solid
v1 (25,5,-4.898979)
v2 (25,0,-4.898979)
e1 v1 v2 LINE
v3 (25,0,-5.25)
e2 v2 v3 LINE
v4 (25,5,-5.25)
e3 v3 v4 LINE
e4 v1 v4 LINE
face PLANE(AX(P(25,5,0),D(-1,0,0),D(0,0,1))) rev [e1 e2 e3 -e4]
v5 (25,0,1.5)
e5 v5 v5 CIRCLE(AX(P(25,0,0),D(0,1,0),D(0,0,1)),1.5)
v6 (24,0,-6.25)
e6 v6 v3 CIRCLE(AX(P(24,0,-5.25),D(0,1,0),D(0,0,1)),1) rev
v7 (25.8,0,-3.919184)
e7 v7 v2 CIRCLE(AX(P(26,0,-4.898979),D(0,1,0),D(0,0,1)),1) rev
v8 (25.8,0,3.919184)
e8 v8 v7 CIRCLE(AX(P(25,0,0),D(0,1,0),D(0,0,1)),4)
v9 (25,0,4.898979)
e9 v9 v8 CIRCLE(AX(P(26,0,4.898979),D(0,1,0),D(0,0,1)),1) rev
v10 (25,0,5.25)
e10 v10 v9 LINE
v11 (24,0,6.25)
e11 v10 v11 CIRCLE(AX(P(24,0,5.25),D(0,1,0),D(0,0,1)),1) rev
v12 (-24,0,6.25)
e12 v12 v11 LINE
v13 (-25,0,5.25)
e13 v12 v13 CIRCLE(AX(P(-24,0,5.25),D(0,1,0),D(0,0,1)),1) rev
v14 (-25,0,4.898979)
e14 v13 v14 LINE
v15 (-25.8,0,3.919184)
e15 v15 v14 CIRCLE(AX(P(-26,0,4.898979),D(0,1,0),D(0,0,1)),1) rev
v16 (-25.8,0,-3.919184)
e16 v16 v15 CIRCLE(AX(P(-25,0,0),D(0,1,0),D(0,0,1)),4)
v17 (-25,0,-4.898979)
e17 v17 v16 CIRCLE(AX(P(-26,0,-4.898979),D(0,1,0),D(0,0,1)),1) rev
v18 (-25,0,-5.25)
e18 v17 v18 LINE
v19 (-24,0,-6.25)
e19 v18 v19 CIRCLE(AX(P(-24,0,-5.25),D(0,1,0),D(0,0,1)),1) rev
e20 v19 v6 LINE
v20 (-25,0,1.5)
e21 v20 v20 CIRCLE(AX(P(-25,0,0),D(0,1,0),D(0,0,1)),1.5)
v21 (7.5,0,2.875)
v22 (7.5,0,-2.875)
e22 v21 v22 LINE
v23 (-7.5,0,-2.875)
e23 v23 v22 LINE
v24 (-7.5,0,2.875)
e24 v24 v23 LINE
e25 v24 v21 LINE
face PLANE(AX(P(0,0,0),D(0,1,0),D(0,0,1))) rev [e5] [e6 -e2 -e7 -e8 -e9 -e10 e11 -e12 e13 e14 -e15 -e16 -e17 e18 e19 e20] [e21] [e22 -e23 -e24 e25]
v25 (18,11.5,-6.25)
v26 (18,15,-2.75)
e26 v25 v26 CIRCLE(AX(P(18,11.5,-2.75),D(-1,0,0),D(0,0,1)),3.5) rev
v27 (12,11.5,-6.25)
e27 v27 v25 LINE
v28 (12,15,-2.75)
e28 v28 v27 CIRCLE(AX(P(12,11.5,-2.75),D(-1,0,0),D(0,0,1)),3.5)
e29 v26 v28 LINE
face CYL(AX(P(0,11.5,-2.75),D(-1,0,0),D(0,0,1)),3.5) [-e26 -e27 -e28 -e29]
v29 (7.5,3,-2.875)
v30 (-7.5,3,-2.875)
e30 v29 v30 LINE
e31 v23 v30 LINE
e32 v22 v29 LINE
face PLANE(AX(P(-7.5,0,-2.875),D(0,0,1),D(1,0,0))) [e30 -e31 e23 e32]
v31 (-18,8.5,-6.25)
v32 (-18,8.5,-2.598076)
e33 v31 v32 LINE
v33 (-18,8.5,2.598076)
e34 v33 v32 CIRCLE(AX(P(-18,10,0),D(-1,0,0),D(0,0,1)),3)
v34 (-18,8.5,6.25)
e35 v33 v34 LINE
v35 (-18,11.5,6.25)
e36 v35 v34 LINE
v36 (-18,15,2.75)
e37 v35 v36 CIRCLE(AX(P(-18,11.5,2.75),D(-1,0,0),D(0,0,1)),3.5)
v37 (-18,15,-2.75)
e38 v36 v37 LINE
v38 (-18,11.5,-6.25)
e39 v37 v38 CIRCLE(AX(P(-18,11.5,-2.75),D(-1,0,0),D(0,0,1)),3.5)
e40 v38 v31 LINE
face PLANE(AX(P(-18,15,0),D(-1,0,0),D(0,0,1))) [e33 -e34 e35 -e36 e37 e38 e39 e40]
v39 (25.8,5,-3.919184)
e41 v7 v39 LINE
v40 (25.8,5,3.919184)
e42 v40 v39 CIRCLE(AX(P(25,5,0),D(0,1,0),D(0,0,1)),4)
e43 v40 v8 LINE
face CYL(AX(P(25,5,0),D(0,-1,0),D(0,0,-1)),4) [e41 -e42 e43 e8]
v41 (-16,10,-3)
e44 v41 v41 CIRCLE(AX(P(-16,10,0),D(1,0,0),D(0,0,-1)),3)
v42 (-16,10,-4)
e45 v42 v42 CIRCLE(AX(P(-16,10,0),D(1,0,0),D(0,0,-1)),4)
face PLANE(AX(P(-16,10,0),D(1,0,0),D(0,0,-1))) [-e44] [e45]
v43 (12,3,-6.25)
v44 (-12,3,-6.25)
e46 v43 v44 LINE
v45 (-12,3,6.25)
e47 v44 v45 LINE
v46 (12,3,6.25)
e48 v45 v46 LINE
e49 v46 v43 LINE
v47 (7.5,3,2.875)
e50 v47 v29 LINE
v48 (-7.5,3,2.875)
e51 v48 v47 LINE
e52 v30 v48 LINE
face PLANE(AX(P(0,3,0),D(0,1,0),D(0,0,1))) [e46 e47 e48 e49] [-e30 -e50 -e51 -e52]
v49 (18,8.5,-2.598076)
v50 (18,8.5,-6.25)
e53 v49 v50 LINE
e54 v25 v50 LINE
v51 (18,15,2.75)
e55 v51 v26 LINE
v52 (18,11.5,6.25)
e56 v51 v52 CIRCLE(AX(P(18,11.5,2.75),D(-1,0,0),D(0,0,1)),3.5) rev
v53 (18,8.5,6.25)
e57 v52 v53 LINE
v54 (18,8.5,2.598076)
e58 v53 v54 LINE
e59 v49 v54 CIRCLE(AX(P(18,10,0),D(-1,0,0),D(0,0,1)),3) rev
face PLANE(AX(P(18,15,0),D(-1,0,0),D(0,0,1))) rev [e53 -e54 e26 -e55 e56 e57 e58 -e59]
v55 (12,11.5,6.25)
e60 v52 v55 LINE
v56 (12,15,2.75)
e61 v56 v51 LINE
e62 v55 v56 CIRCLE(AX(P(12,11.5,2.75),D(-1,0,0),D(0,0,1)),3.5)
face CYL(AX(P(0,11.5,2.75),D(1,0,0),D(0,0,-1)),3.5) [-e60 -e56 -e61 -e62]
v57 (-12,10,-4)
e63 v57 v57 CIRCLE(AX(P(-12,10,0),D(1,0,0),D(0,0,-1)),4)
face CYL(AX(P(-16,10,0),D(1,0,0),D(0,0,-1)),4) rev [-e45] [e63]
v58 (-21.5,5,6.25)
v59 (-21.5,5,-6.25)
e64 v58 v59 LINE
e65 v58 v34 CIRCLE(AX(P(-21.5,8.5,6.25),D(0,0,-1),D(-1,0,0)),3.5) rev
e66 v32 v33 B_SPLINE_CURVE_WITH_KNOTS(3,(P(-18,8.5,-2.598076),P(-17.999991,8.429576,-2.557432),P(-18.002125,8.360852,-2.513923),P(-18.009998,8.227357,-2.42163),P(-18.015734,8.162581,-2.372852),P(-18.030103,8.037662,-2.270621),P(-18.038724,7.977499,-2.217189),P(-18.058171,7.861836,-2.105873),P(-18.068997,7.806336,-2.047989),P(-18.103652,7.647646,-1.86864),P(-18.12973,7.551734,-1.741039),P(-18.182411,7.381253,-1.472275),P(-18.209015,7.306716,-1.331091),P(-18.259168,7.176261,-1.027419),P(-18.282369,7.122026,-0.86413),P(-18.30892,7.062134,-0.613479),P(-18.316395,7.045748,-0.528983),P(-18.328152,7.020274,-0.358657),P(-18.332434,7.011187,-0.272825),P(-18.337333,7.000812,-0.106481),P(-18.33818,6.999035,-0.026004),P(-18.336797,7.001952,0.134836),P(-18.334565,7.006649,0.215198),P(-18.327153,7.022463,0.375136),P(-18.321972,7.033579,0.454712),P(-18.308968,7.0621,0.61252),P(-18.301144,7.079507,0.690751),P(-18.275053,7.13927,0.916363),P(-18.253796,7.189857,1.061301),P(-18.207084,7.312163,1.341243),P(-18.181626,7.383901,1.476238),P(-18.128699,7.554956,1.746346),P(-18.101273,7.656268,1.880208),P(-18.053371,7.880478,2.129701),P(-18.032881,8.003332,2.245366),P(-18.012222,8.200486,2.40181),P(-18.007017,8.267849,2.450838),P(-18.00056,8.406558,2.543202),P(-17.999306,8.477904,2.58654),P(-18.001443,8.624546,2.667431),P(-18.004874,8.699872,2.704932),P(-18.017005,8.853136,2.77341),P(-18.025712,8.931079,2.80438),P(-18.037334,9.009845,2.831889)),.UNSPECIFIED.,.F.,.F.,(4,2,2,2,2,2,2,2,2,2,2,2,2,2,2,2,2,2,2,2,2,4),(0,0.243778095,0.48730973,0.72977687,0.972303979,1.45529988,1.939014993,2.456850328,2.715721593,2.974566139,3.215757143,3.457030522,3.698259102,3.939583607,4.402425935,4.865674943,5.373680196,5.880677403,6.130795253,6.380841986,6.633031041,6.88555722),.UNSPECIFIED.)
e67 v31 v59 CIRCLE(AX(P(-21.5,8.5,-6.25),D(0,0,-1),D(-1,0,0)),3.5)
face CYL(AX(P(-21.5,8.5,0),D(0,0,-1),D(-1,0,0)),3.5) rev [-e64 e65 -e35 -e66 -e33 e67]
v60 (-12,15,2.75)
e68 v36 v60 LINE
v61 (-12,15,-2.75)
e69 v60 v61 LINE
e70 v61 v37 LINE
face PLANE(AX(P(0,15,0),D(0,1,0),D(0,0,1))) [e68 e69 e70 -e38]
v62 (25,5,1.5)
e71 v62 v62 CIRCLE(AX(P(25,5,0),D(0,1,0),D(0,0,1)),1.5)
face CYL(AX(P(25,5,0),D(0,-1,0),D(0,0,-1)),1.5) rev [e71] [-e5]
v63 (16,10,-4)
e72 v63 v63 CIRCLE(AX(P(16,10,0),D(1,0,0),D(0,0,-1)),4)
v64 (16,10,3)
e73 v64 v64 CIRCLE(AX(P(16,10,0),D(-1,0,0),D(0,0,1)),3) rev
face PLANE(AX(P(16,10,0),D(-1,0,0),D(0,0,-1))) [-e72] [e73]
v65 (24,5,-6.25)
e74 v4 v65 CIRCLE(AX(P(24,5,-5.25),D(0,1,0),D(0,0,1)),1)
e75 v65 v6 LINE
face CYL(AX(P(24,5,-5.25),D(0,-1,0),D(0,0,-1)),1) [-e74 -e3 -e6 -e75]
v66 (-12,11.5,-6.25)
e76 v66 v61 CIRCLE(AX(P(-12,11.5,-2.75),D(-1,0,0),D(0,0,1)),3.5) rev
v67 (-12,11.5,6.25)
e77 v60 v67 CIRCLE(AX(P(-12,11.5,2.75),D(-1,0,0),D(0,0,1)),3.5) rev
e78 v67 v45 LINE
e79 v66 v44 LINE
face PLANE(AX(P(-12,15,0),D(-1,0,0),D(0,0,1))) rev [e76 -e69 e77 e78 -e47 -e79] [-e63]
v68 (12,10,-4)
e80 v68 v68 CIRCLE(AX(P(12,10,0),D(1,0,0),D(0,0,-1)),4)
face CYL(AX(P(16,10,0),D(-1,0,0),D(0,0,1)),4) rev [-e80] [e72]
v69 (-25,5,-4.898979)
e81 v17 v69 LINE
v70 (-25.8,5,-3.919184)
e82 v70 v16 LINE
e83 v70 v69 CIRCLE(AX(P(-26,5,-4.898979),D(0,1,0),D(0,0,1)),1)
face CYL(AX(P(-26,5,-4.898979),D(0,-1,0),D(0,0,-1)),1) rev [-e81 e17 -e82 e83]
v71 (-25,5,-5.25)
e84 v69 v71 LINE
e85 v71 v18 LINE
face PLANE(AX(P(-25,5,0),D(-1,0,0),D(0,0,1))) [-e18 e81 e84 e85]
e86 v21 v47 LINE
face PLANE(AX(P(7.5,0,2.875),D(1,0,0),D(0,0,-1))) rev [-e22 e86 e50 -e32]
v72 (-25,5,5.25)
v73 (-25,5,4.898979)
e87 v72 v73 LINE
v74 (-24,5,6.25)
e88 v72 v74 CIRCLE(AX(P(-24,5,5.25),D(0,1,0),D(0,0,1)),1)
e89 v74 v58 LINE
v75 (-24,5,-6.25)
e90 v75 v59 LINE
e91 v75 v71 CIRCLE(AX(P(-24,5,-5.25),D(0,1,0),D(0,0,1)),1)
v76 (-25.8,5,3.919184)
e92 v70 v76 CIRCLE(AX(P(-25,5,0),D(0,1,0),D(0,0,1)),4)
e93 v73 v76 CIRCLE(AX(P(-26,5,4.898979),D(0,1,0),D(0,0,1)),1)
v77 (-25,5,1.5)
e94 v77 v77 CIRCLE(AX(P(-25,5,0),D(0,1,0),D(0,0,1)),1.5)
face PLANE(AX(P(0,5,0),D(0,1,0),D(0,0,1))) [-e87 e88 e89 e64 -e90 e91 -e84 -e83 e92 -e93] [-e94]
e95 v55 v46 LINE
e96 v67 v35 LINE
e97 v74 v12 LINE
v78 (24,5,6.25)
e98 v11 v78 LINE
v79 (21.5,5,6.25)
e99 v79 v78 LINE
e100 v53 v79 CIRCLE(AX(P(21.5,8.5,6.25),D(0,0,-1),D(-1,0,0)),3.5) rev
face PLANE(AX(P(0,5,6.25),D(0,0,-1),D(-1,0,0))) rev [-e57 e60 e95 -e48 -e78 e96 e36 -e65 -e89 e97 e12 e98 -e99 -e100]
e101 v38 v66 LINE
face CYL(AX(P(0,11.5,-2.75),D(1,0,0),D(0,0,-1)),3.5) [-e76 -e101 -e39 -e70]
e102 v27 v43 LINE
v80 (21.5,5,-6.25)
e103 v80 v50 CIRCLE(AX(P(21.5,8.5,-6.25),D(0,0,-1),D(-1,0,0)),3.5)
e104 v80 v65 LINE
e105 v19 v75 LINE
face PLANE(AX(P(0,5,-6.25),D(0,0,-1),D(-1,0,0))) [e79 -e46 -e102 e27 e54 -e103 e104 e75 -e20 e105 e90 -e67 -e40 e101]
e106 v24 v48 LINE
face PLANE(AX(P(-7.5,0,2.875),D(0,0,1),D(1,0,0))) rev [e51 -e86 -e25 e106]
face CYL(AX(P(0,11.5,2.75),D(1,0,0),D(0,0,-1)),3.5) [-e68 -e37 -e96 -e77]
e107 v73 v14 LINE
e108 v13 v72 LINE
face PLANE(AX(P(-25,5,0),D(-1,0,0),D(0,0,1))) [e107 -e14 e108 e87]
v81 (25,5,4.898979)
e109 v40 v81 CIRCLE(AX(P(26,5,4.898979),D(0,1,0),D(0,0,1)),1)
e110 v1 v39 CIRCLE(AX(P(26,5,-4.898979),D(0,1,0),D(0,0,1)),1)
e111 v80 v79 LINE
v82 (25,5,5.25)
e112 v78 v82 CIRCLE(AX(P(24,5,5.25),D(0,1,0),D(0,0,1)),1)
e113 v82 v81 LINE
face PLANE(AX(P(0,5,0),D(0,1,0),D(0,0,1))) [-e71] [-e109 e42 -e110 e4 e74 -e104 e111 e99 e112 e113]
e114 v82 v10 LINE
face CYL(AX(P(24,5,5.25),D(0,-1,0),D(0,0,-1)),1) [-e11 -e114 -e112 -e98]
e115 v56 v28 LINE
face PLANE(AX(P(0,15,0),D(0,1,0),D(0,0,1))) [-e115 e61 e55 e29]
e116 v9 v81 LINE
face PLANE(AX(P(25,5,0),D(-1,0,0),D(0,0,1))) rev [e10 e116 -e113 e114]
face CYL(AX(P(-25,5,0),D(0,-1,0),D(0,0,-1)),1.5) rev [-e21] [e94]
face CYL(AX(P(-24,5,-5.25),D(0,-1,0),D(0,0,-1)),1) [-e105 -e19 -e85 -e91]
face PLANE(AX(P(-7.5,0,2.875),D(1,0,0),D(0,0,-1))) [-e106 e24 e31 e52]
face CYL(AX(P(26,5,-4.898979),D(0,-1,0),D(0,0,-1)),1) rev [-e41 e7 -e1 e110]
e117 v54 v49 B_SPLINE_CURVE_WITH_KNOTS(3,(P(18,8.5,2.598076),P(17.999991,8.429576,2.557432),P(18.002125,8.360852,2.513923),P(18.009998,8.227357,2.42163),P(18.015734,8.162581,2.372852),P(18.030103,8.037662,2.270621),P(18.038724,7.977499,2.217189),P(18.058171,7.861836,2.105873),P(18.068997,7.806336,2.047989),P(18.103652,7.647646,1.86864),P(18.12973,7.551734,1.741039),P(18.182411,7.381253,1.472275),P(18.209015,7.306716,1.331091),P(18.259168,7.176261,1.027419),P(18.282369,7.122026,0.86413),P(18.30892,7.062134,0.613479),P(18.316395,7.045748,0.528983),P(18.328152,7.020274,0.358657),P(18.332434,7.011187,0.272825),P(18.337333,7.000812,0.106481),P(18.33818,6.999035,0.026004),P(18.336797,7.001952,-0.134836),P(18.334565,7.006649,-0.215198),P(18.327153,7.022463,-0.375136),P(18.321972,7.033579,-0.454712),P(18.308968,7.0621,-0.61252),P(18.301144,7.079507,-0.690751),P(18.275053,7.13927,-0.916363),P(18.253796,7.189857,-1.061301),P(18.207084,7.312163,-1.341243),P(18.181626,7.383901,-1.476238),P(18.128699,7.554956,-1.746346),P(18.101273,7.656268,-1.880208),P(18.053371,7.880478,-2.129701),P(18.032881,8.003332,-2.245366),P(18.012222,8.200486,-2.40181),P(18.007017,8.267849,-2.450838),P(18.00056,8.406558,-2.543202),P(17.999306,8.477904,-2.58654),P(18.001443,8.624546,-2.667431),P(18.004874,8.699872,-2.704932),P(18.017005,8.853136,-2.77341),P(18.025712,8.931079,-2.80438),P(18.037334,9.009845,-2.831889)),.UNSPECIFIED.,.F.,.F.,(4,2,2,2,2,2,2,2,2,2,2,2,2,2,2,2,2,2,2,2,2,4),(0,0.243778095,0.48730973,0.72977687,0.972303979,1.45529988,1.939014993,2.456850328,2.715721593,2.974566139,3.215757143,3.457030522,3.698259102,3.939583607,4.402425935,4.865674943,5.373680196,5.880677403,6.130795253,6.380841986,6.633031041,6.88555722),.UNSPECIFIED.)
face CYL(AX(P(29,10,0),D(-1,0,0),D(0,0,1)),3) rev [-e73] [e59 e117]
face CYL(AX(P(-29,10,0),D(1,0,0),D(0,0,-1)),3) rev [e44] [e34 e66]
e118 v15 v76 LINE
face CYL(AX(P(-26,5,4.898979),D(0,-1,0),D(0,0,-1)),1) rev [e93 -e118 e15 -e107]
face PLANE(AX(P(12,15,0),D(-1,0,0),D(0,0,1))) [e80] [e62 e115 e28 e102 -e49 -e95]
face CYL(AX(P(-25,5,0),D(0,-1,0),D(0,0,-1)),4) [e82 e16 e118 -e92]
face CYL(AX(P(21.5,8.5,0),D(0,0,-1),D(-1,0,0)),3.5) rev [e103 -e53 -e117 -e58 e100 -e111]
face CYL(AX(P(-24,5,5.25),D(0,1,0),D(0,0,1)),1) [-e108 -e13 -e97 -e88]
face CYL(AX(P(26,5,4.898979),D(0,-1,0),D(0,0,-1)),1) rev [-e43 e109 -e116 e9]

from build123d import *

# Parameters (mm, degrees)
SKETCH1_R           = 1.5
BOSS_EXTRUDE1_DEPTH = 5
BOSS_EXTRUDE2_DEPTH = 10
SKETCH3_R           = 4
CUT_EXTRUDE1_DEPTH  = 4
SKETCH3_3_R         = 3
CUT_EXTRUDE2_DEPTH  = 45.102862719
FILLET6_R           = 3.5
FILLET7_R           = 3.5
FILLET8_R           = 3.5
FILLET9_R           = 3.5
FILLET10_R          = 3.5
FILLET11_R          = 3.5
FILLET12_R          = 1
FILLET13_R          = 1
FILLET14_R          = 1
FILLET15_R          = 1
FILLET16_R          = 1
FILLET17_R          = 1
FILLET18_R          = 1
FILLET19_R          = 1
SKETCH4_W           = 15
SKETCH4_H           = 5.75
CUT_EXTRUDE3_DEPTH  = 32.305949934
SKETCH5_W           = 24
SKETCH5_H           = 12.5
SKETCH5_W_2         = 15
SKETCH5_H_2         = 5.75
CUT_EXTRUDE4_DEPTH  = 2


with BuildPart() as part:
    # Sketch1 → Boss-Extrude1 (new body)
    with BuildSketch(Plane(origin=(0, 0, 0), x_dir=(1, 0, 0), z_dir=(0, 1, 0))):
        with BuildLine():
            Line((-25, -4), (-25, -6.25))
            Line((-25, -6.25), (25, -6.25))
            Line((25, -6.25), (25, -4))
            ThreePointArc((25, -4), (29, 0), (25, 4))
            Line((25, 4), (25, 6.25))
            Line((25, 6.25), (-25, 6.25))
            Line((-25, 6.25), (-25, 4))
            ThreePointArc((-25, 4), (-29, 0), (-25, -4))
        make_face()
        with Locations(Location((25, 0, 0), (0, 0, 270))):
            Circle(SKETCH1_R, mode=Mode.SUBTRACT)
        with Locations(Location((-25, 0, 0), (0, 0, 270))):
            Circle(SKETCH1_R, mode=Mode.SUBTRACT)
    extrude(amount=BOSS_EXTRUDE1_DEPTH)

    # Sketch2 → Boss-Extrude2 (add)
    with BuildSketch(Plane(origin=(0, 5, 0), x_dir=(1, 0, 0), z_dir=(0, 1, 0))):
        Polygon((-18, 0), (-18, -6.25), (-12, -6.25), (-12, 6.25), (-18, 6.25), align=None)
    boss_extrude2 = extrude(amount=BOSS_EXTRUDE2_DEPTH)

    # Sketch3 → Cut-Extrude1 (cut)
    with BuildSketch(Plane(origin=(-12, 0, 0), x_dir=(0, 0, -1), z_dir=(1, 0, 0))):
        with Locations((0, 10)):
            Circle(SKETCH3_R)
    cut_extrude1 = extrude(amount=-CUT_EXTRUDE1_DEPTH, mode=Mode.SUBTRACT)

    # Sketch3<3> → Cut-Extrude2 (cut, through all)
    with BuildSketch(Plane(origin=(-12, 0, 0), x_dir=(0, 0, -1), z_dir=(1, 0, 0))):
        with Locations((0, 10)):
            Circle(SKETCH3_3_R)
    cut_extrude2 = extrude(amount=-CUT_EXTRUDE2_DEPTH, mode=Mode.SUBTRACT)

    # Fillet6
    # the kernel refuses this fillet: 3.5 mm, written as the material it adds along each edge
    with BuildSketch(Plane(origin=(-18, 5, -6.25), x_dir=(0, 1, 0), z_dir=(0, 0, 1))) as fillet6_piece_1_section:
        with BuildLine():
            CenterArc((FILLET6_R, FILLET6_R), FILLET6_R, 180, 90)
            Line((0, FILLET6_R), (0, 0))
            Line((0, 0), (FILLET6_R, 0))
        make_face()
    fillet6_piece_1 = extrude(amount=12.5, mode=Mode.PRIVATE)
    fillet6_piece_1 = fillet6_piece_1 - Plane(origin=(-18.808785758, 10, 0), x_dir=(0, 0, -1), z_dir=(1, 0, 0)) * Cylinder(3, 39, mode=Mode.PRIVATE)
    add(fillet6_piece_1)

    # Fillet7
    fillet7_edges = [part.edges().sort_by_distance(p)[0] for p in [
        (-15, 15, -6.25),
    ]]
    fillet(fillet7_edges, radius=FILLET7_R)

    # Fillet8
    fillet8_edges = [part.edges().sort_by_distance(p)[0] for p in [
        (-15, 15, 6.25),
    ]]
    fillet(fillet8_edges, radius=FILLET8_R)

    # Mirror4: Boss-Extrude2, Cut-Extrude1, Cut-Extrude2 across plane
    add(boss_extrude2.mirror(Plane(origin=(0, 0, 0), x_dir=(0, 0, 1), z_dir=(1, 0, 0))))
    add(cut_extrude1.mirror(Plane(origin=(0, 0, 0), x_dir=(0, 0, 1), z_dir=(1, 0, 0))), mode=Mode.SUBTRACT)
    add(cut_extrude2.mirror(Plane(origin=(0, 0, 0), x_dir=(0, 0, 1), z_dir=(1, 0, 0))), mode=Mode.SUBTRACT)

    # Fillet9
    fillet9_edges = [part.edges().sort_by_distance(p)[0] for p in [
        (15, 15, -6.25),
    ]]
    fillet(fillet9_edges, radius=FILLET9_R)

    # Fillet10
    fillet10_edges = [part.edges().sort_by_distance(p)[0] for p in [
        (15, 15, 6.25),
    ]]
    fillet(fillet10_edges, radius=FILLET10_R)

    # Fillet11
    # the kernel refuses this fillet: 3.5 mm, written as the material it adds along each edge
    with BuildSketch(Plane(origin=(18, 5, -6.25), x_dir=(0, 1, 0), z_dir=(0, 0, 1))) as fillet11_piece_1_section:
        with BuildLine():
            CenterArc((FILLET11_R, -FILLET11_R), FILLET11_R, 90, 90)
            Line((0, -FILLET11_R), (0, 0))
            Line((0, 0), (FILLET11_R, 0))
        make_face()
    fillet11_piece_1 = extrude(amount=12.5, mode=Mode.PRIVATE)
    fillet11_piece_1 = fillet11_piece_1 - Plane(origin=(18.808785758, 10, 0), x_dir=(0, 0, -1), z_dir=(-1, 0, 0)) * Cylinder(3, 39, mode=Mode.PRIVATE)
    add(fillet11_piece_1)

    # Fillet12
    fillet12_edges = [part.edges().sort_by_distance(p)[0] for p in [
        (25, 2.5, -6.25),
    ]]
    fillet(fillet12_edges, radius=FILLET12_R)

    # Fillet13
    fillet13_edges = [part.edges().sort_by_distance(p)[0] for p in [
        (25, 2.5, 6.25),
    ]]
    fillet(fillet13_edges, radius=FILLET13_R)

    # Fillet14
    fillet14_edges = [part.edges().sort_by_distance(p)[0] for p in [
        (-25, 2.5, 6.25),
    ]]
    fillet(fillet14_edges, radius=FILLET14_R)

    # Fillet15
    fillet15_edges = [part.edges().sort_by_distance(p)[0] for p in [
        (-25, 2.5, -6.25),
    ]]
    fillet(fillet15_edges, radius=FILLET15_R)

    # Fillet16
    fillet16_edges = [part.edges().sort_by_distance(p)[0] for p in [
        (-25, 2.5, -4),
    ]]
    fillet(fillet16_edges, radius=FILLET16_R)

    # Fillet17
    fillet17_edges = [part.edges().sort_by_distance(p)[0] for p in [
        (-25, 2.5, 4),
    ]]
    fillet(fillet17_edges, radius=FILLET17_R)

    # Fillet18
    fillet18_edges = [part.edges().sort_by_distance(p)[0] for p in [
        (25, 2.5, 4),
    ]]
    fillet(fillet18_edges, radius=FILLET18_R)

    # Fillet19
    fillet19_edges = [part.edges().sort_by_distance(p)[0] for p in [
        (25, 2.5, -4),
    ]]
    fillet(fillet19_edges, radius=FILLET19_R)

    # Sketch4 → Cut-Extrude3 (cut, through all)
    with BuildSketch(Plane(origin=(0, 5, 0), x_dir=(1, 0, 0), z_dir=(0, 1, 0))):
        Rectangle(SKETCH4_W, SKETCH4_H)
    extrude(amount=-CUT_EXTRUDE3_DEPTH, mode=Mode.SUBTRACT)

    # Sketch5 → Cut-Extrude4 (cut)
    with BuildSketch(Plane(origin=(0, 5, 0), x_dir=(1, 0, 0), z_dir=(0, 1, 0))):
        Rectangle(SKETCH5_W, SKETCH5_H)
        Rectangle(SKETCH5_W_2, SKETCH5_H_2, mode=Mode.SUBTRACT)
    extrude(amount=-CUT_EXTRUDE4_DEPTH, mode=Mode.SUBTRACT)


solid = part.part
